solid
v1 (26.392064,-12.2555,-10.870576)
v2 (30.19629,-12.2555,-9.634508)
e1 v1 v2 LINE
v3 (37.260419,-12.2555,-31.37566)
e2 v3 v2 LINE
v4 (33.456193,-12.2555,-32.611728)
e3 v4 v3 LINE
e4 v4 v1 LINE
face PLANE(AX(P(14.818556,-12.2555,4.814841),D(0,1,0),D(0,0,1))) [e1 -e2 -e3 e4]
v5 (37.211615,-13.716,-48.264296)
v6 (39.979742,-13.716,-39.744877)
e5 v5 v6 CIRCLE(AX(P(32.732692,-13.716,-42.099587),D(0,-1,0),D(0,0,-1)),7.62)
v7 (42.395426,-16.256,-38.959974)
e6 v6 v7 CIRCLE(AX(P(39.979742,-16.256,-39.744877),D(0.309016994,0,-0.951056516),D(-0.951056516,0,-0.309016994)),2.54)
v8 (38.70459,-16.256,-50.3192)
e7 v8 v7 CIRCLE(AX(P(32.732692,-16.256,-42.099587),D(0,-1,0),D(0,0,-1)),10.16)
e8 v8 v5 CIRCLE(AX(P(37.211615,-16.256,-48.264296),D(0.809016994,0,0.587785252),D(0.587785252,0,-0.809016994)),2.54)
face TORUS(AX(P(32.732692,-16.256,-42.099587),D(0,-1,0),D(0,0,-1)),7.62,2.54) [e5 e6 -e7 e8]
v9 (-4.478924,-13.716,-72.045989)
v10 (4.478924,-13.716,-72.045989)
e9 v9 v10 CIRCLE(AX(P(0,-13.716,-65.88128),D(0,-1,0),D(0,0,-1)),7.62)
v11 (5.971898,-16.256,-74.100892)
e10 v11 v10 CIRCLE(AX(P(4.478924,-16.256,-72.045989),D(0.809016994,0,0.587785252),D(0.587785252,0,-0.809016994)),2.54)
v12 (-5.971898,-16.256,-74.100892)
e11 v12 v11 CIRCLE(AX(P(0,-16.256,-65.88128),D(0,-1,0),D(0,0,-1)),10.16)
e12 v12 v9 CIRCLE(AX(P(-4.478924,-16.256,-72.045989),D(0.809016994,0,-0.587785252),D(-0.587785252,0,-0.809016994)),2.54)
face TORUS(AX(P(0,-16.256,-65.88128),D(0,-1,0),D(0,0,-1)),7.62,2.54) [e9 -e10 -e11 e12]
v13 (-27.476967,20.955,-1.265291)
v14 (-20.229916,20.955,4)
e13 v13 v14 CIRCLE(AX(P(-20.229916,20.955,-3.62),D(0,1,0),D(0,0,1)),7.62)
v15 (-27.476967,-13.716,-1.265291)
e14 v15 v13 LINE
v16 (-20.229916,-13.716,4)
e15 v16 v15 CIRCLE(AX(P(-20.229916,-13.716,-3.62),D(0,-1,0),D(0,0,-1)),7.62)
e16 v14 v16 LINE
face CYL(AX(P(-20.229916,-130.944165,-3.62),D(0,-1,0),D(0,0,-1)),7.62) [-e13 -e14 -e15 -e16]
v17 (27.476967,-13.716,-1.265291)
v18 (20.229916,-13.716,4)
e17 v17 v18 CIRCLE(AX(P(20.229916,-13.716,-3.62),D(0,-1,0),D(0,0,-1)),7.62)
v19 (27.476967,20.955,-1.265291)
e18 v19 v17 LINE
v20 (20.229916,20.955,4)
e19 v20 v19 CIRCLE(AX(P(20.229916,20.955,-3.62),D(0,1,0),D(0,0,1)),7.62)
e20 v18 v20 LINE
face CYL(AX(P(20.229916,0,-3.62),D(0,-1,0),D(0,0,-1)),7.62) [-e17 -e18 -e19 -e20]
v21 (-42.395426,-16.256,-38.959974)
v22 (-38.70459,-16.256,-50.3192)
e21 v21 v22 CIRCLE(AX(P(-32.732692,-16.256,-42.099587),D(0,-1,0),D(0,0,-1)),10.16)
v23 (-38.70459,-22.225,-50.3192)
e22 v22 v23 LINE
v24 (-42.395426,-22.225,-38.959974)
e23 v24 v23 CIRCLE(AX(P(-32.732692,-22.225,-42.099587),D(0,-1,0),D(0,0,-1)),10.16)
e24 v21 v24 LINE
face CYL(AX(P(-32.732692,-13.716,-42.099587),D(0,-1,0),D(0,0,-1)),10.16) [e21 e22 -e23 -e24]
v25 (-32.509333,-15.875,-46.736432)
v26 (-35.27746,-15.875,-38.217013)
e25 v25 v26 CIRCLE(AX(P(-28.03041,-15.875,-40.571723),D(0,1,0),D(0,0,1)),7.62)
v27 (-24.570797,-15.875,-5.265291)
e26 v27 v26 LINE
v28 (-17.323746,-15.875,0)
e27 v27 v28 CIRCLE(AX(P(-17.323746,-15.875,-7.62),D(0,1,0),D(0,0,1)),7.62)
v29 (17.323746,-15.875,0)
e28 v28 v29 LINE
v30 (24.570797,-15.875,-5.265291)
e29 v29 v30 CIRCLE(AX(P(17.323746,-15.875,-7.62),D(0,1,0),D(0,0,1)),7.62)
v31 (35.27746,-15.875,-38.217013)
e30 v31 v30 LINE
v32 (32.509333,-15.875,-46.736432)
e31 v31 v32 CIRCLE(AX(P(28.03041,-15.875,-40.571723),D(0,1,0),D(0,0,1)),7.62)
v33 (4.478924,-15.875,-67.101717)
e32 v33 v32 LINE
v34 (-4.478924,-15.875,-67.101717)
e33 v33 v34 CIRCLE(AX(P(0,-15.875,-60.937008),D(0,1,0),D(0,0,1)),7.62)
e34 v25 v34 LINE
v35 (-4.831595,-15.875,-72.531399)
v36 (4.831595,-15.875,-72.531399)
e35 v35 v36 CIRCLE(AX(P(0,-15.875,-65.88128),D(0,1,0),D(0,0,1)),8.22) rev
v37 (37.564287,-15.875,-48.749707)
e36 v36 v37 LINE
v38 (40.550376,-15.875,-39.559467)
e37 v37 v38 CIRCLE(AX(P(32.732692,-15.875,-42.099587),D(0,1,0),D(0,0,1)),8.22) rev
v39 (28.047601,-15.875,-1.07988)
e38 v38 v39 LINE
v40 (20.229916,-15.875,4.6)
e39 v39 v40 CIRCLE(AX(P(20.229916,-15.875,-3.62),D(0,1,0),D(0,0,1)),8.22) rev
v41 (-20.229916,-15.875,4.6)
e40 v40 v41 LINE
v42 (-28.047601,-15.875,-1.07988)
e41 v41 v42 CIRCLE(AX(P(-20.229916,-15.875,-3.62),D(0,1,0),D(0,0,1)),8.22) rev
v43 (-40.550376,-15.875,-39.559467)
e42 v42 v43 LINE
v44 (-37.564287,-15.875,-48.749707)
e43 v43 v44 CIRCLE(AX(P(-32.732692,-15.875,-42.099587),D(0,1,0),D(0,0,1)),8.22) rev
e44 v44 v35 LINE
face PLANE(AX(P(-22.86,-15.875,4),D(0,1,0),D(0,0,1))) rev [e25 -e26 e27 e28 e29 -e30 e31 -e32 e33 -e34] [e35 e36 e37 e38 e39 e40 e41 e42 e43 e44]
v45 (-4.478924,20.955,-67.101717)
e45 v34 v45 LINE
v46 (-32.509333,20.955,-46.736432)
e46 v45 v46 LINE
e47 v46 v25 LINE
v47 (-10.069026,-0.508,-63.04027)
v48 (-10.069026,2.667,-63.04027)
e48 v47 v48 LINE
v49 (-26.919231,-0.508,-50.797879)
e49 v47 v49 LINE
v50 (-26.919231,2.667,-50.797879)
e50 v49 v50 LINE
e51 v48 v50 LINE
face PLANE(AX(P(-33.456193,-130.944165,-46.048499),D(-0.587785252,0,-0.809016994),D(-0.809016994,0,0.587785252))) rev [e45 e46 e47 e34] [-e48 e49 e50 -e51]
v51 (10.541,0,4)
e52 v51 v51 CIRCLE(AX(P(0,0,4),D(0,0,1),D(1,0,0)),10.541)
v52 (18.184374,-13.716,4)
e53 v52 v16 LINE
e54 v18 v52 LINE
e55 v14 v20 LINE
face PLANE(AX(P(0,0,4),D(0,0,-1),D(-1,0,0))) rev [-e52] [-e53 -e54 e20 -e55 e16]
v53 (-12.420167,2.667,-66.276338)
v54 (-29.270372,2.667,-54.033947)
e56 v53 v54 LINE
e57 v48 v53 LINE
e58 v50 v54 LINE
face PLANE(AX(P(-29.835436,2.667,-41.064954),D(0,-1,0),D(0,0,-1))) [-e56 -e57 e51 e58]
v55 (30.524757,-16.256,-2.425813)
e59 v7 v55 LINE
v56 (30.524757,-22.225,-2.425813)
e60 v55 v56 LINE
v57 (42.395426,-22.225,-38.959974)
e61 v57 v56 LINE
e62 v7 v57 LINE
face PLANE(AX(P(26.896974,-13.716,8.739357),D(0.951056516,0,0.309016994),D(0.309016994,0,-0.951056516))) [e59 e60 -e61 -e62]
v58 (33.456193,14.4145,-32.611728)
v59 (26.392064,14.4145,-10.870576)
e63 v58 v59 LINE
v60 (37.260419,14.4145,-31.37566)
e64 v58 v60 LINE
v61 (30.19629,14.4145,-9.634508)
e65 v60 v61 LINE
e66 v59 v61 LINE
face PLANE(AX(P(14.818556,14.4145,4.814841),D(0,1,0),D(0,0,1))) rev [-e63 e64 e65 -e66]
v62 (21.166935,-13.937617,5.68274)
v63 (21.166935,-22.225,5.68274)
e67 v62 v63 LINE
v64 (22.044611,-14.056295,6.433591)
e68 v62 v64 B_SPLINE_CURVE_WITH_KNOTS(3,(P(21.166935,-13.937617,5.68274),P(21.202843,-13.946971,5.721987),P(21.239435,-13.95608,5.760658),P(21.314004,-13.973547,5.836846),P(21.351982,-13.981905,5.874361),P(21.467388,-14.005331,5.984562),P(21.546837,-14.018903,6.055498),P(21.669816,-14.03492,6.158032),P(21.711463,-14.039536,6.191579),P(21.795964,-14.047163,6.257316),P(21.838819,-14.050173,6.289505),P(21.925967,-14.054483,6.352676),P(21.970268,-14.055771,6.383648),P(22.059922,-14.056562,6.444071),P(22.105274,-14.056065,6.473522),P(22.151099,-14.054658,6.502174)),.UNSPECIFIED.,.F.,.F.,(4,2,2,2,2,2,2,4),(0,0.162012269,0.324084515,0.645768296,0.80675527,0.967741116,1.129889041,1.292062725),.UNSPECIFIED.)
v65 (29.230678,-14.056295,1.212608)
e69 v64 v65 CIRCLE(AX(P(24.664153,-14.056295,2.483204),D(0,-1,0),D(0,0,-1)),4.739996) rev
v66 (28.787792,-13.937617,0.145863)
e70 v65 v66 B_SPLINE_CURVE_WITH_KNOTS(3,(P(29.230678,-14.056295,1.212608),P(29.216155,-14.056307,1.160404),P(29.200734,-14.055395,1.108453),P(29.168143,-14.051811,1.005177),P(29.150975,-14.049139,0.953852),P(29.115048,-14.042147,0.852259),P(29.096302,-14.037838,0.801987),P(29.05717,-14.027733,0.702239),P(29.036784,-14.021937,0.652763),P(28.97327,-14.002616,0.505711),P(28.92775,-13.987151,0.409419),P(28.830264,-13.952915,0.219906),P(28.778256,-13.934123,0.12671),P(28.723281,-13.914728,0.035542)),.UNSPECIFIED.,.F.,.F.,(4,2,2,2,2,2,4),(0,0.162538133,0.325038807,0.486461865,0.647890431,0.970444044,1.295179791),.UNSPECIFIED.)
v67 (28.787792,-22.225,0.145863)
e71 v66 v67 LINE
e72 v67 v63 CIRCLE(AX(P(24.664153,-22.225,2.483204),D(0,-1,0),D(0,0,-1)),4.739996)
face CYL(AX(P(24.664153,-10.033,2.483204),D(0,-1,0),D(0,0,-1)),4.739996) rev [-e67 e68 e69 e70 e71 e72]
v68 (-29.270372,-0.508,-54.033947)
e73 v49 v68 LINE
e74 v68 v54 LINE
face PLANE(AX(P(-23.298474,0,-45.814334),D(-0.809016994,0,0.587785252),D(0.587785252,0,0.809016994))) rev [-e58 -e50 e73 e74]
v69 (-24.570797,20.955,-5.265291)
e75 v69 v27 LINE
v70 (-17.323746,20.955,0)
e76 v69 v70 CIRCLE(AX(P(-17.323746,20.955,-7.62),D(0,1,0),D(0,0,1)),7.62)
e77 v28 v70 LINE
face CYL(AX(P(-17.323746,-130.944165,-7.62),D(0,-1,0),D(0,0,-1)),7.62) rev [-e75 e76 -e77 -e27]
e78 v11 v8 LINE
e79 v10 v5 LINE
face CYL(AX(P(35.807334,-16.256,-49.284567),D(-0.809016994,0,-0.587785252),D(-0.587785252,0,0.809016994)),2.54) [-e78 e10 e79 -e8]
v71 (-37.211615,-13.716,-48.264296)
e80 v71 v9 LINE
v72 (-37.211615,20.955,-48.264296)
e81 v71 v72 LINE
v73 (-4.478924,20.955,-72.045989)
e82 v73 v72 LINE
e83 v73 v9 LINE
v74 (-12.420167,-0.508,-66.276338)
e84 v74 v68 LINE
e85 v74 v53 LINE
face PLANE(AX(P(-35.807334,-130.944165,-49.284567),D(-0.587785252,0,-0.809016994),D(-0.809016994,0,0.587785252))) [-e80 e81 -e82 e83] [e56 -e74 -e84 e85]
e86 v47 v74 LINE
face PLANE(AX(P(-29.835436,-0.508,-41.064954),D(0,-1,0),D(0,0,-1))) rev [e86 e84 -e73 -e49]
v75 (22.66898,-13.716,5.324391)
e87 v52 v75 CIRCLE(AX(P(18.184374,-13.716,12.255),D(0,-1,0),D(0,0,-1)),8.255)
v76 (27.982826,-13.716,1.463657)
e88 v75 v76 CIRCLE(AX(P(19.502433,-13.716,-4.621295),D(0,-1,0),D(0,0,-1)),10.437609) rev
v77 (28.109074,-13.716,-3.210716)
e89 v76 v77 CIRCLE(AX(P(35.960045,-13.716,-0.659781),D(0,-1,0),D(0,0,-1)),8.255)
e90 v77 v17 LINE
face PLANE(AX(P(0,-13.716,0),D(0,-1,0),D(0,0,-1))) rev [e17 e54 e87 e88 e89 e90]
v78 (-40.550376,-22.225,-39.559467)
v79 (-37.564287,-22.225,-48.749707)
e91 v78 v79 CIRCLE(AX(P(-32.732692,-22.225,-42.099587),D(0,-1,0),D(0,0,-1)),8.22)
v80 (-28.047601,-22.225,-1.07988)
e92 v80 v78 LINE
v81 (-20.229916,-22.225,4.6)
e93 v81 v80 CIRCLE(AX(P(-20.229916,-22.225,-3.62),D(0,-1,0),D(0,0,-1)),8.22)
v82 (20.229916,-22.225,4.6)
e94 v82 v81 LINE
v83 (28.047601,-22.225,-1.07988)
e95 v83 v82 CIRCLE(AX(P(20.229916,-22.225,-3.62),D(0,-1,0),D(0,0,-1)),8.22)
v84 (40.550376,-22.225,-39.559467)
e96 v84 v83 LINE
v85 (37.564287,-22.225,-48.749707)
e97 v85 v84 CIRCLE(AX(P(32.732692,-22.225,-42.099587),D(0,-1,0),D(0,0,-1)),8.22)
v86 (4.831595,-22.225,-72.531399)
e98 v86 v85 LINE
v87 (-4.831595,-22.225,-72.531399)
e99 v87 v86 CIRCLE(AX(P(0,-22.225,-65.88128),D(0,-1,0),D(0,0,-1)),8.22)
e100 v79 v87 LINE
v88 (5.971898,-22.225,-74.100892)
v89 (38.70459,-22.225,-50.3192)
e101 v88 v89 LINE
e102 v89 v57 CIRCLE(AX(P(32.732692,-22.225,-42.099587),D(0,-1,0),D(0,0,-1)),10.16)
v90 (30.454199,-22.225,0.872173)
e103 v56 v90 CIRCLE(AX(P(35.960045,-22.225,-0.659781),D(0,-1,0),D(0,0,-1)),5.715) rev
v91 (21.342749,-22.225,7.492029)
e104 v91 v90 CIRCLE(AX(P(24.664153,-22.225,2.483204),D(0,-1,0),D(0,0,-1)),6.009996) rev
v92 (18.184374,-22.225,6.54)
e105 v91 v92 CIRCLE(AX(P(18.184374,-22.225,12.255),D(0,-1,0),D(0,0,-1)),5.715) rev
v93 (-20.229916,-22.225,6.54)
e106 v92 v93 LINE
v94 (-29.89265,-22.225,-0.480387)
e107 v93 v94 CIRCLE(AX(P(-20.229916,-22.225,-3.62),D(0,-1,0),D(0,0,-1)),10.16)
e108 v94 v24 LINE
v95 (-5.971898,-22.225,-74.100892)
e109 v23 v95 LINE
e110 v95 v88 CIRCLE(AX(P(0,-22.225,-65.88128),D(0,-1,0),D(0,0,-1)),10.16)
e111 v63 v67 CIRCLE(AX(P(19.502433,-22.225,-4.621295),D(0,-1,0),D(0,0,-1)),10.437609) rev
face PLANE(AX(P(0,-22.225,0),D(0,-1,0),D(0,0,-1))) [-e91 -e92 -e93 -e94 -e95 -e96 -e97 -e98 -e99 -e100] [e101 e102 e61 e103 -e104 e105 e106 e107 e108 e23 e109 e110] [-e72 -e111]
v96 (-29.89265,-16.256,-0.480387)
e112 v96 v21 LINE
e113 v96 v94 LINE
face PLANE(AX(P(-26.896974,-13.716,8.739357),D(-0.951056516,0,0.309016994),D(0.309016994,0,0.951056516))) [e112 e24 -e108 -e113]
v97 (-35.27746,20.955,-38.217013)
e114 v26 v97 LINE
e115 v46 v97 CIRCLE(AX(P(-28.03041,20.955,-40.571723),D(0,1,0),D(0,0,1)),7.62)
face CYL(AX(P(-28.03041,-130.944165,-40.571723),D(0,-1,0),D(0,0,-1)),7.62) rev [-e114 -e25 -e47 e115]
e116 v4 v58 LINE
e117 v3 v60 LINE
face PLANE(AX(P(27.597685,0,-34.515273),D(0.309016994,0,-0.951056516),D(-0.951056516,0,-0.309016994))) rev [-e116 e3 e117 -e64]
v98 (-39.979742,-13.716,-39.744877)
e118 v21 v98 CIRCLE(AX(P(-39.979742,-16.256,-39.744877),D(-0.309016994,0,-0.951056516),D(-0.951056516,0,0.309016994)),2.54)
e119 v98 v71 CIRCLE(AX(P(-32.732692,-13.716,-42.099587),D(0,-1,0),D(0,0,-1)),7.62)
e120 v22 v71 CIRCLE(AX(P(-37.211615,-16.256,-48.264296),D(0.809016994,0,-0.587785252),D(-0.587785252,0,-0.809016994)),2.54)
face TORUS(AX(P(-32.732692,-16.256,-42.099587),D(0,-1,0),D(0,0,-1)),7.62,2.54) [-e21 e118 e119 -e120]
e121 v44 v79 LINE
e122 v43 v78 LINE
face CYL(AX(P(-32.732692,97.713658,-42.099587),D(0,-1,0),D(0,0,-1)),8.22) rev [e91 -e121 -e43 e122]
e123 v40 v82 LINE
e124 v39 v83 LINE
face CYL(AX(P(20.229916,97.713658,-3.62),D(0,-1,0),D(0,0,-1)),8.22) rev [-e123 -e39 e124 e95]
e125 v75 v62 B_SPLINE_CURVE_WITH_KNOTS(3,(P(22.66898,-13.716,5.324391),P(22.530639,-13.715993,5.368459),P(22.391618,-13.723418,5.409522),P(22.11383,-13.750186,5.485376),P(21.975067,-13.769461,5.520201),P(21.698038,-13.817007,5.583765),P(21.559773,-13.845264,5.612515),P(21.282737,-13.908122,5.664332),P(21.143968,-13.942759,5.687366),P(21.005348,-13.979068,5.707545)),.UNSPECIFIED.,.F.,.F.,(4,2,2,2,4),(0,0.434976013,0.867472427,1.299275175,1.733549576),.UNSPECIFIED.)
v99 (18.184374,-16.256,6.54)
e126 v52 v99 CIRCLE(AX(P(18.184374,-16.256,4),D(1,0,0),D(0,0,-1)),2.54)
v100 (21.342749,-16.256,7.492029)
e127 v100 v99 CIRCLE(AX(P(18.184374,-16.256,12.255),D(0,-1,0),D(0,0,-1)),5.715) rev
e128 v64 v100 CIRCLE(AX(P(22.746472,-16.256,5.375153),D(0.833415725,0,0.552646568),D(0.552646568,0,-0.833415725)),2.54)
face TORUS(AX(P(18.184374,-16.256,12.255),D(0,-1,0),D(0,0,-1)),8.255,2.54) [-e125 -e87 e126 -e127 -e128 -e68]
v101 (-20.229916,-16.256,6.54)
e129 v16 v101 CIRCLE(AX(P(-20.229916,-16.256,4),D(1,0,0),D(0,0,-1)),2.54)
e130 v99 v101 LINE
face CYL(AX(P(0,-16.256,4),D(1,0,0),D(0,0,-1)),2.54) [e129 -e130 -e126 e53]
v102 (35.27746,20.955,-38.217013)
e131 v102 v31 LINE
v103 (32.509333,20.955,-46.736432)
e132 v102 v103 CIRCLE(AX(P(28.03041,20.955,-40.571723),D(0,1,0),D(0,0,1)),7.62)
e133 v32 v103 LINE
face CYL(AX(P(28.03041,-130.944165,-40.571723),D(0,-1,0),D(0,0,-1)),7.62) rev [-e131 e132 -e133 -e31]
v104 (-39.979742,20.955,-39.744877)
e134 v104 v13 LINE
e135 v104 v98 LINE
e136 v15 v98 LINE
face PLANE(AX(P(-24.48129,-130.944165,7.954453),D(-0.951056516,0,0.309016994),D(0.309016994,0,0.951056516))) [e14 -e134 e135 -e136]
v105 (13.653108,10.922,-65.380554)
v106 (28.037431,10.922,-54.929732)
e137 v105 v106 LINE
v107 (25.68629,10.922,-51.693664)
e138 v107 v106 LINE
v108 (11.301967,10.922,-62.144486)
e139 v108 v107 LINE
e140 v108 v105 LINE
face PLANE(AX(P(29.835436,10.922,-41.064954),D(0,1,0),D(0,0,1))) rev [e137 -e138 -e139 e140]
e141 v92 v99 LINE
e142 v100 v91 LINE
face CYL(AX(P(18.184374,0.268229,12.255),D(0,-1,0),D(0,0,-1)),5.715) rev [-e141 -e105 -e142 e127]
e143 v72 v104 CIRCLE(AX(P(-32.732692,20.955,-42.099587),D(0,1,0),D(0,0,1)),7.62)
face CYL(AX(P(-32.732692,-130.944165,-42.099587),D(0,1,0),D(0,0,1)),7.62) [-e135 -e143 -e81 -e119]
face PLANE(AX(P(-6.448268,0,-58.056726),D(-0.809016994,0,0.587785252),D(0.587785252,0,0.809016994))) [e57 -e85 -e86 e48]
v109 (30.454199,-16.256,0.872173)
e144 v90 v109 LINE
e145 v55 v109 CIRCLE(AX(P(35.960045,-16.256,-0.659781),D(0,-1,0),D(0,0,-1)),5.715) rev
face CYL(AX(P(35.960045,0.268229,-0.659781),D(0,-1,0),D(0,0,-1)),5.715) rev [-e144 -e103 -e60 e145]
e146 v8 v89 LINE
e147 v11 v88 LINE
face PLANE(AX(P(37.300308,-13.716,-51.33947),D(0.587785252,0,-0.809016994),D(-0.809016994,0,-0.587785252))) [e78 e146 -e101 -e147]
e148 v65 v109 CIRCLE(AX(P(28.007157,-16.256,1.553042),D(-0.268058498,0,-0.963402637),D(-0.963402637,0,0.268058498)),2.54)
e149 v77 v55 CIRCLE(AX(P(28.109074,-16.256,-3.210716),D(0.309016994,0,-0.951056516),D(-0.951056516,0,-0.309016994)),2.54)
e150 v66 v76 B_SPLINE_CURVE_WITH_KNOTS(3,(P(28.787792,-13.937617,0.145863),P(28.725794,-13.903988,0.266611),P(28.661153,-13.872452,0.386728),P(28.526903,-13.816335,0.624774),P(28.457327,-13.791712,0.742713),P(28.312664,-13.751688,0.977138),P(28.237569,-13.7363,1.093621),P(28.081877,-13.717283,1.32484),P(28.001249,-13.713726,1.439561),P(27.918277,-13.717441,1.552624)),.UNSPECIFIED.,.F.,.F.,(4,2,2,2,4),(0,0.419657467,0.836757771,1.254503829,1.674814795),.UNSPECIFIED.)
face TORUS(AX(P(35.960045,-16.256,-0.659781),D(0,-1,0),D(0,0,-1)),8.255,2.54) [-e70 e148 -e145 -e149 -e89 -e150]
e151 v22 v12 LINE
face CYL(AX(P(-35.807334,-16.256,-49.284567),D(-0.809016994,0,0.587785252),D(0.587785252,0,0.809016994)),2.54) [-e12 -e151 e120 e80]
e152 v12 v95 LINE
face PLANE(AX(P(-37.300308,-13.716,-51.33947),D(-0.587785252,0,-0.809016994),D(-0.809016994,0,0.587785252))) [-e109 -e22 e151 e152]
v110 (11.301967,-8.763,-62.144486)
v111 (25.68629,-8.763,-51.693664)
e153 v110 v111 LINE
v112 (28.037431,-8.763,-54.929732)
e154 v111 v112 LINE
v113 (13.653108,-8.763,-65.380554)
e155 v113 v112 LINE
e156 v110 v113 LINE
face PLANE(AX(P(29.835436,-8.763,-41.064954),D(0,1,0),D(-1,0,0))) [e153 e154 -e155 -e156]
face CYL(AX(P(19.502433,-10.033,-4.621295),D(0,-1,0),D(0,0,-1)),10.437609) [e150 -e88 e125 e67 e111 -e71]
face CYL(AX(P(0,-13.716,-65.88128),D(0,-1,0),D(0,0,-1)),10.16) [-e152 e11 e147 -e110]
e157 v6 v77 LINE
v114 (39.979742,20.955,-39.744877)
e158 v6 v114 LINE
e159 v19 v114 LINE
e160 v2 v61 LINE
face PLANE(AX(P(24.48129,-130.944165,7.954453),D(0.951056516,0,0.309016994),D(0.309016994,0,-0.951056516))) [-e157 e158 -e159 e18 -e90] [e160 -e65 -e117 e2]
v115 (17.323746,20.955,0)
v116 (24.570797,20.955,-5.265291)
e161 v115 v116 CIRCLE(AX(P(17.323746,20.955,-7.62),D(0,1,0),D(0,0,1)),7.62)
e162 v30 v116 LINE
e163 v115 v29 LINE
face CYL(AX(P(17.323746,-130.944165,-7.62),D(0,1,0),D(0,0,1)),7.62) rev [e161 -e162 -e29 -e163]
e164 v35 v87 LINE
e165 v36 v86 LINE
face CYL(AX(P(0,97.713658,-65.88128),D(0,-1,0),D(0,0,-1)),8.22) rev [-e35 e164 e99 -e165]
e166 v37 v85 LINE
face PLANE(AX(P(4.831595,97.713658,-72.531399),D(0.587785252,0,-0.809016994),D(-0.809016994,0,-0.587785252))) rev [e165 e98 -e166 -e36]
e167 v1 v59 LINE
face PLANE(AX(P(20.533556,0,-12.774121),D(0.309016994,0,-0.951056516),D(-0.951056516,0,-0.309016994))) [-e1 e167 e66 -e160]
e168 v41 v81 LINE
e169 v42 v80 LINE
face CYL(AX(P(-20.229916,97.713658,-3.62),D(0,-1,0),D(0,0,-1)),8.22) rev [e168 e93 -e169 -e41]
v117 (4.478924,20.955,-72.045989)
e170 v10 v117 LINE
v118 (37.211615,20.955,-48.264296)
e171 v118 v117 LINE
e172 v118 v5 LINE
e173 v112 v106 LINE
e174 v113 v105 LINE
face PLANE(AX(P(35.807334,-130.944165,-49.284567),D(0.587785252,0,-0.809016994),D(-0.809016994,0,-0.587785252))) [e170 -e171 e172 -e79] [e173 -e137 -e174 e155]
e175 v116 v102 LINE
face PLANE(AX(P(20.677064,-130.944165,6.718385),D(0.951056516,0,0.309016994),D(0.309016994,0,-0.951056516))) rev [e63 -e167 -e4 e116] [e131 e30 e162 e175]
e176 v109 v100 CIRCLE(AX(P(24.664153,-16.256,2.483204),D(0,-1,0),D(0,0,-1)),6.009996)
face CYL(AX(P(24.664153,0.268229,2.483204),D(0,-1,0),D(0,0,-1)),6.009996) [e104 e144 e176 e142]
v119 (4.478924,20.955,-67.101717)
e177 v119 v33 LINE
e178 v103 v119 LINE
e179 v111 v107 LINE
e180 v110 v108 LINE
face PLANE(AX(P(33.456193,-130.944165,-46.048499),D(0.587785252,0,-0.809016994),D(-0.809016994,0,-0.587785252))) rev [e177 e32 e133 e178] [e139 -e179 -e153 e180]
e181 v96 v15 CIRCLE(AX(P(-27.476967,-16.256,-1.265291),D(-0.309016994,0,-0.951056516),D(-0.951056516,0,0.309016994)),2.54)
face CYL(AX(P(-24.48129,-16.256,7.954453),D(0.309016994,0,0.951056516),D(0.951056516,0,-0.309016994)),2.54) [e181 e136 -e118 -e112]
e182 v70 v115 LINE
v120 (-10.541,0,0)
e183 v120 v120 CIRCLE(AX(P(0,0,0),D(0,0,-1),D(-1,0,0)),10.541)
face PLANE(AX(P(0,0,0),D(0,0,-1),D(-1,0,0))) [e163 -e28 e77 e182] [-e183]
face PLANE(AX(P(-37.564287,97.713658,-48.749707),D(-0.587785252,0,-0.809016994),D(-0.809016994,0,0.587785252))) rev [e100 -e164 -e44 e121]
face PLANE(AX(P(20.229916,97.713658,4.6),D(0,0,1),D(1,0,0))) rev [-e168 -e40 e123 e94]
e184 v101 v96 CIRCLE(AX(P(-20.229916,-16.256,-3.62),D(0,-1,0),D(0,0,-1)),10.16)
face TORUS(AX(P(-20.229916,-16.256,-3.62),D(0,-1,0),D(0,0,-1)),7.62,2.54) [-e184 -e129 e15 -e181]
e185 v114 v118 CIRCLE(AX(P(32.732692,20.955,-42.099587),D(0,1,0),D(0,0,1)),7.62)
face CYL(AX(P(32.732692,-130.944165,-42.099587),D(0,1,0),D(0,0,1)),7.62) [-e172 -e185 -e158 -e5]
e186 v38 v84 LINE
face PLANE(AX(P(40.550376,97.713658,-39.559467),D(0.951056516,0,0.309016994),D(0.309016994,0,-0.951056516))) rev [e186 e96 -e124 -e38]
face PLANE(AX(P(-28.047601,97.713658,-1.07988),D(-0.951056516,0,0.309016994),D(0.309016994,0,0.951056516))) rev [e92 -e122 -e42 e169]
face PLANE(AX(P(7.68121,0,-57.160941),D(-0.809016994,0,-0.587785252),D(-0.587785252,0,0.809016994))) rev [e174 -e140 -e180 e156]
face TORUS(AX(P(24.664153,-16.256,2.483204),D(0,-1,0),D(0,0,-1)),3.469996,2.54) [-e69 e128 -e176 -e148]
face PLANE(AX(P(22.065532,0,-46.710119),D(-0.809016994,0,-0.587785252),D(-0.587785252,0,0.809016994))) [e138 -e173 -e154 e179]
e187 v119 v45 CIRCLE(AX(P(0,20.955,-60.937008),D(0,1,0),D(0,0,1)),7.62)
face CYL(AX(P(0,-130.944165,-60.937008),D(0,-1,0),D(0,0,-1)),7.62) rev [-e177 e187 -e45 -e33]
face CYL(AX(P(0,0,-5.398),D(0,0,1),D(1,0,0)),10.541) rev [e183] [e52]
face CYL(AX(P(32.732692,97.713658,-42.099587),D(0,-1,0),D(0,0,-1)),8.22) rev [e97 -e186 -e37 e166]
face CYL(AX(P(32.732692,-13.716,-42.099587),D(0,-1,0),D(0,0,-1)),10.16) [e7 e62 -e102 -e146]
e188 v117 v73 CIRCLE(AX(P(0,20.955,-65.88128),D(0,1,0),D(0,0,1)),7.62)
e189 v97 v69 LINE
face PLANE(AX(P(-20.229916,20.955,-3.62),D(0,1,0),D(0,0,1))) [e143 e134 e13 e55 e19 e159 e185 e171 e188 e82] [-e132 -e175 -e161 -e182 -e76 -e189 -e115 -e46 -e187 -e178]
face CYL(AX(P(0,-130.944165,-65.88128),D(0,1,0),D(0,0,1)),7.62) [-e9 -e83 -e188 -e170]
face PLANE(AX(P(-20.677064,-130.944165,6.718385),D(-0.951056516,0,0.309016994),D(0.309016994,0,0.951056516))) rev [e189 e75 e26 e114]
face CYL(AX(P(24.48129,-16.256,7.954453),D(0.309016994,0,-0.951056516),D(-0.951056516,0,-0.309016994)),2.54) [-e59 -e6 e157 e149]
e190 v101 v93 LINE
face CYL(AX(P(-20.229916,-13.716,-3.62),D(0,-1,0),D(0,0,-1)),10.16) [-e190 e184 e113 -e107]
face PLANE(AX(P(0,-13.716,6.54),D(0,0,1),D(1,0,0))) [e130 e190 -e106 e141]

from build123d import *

# Parameters (mm, degrees)
SKETCH1_W                = 45.72
SKETCH1_H                = 31.75
SKETCH1_R                = 10.16
BOSS_EXTRUDE1_DEPTH      = 4
BOSS_EXTRUDE2_DEPTH      = 31.75
FILLET1_R                = 7.62
BOSS_EXTRUDE3_DEPTH      = 5.08
BOSS_EXTRUDE4_DEPTH      = 6.35
BOSS_EXTRUDE4_DEPTH_BACK = 2.159
BOSS_EXTRUDE5_START      = -8.509
BOSS_EXTRUDE5_DEPTH      = 8.509
CUT_EXTRUDE4_DEPTH       = 12.192
FILLET5_R                = 5.715
FILLET6_R                = 2.54
CUT_EXTRUDE5_DEPTH       = 6.35
SKETCH14_W               = 22.86
SKETCH14_H               = 26.67
CUT_EXTRUDE6_DEPTH       = 10.16
SKETCH15_W               = 17.78
SKETCH15_H               = 19.685
CUT_EXTRUDE7_DEPTH       = 10.16
SKETCH16_W               = 20.828
SKETCH16_H               = 3.175
CUT_EXTRUDE8_DEPTH       = 10.16
CUT_EXTRUDE9_START       = -9.398
SKETCH17_R               = 10.541
SKETCH17_R_2             = 10.16
CUT_EXTRUDE9_DEPTH       = 9.398


with BuildPart() as part:
    # Sketch1 → Boss-Extrude1 (new body)
    with BuildSketch(Plane.XY):
        Rectangle(SKETCH1_W, SKETCH1_H)
        Circle(SKETCH1_R, mode=Mode.SUBTRACT)
    extrude(amount=BOSS_EXTRUDE1_DEPTH)

    # Sketch2 → Boss-Extrude2 (add)
    with BuildSketch(Plane(origin=(0, 15.875, 0), x_dir=(1, 0, 0), z_dir=(0, 1, 0))):
        Polygon((36.988256983, 43.482303925), (22.86, 0), (22.86, -4), (25.766170112, -4), (41.690539001, 45.01016797), (0, 75.30011757), (-41.690539001, 45.01016797), (-25.766170112, -4), (-22.86, -4), (-22.86, 0), (-36.988256983, 43.482303925), (0, 70.35584566), align=None)
    extrude(amount=-BOSS_EXTRUDE2_DEPTH)

    # Fillet1
    fillet1_edges = [part.edges().sort_by_distance(p)[0] for p in [
        (0, 0, -75.30011757),
        (41.690539001, 0, -45.01016797),
        (25.766170112, 0, 4),
        (36.988256983, 0, -43.482303925),
        (0, 0, -70.35584566),
        (-36.988256983, 0, -43.482303925),
        (-25.766170112, 0, 4),
        (-41.690539001, 0, -45.01016797),
        (-22.86, 0, 0),
        (22.86, 0, 0),
    ]]
    fillet(fillet1_edges, radius=FILLET1_R)

    # Sketch6 → Boss-Extrude3 (add)
    with BuildSketch(Plane(origin=(0, 15.875, 0), x_dir=(1, 0, 0), z_dir=(0, 1, 0))):
        with BuildLine():
            Line((-20.229916049, -4), (20.229916049, -4))
            ThreePointArc((20.229916049, -4), (24.708839671, -2.544709497), (27.476966703, 1.265290503))
            Line((27.476966703, 1.265290503), (39.97974241, 39.744877467))
            ThreePointArc((39.97974241, 39.744877467), (39.97974241, 44.454296461), (37.211615379, 48.264296461))
            Line((37.211615379, 48.264296461), (4.478923622, 72.045989078))
            ThreePointArc((4.478923622, 72.045989078), (0, 73.501279581), (-4.478923622, 72.045989078))
            Line((-4.478923622, 72.045989078), (-37.211615379, 48.264296461))
            ThreePointArc((-37.211615379, 48.264296461), (-39.97974241, 44.454296461), (-39.97974241, 39.744877467))
            Line((-39.97974241, 39.744877467), (-27.476966703, 1.265290503))
            ThreePointArc((-27.476966703, 1.265290503), (-24.708839671, -2.544709497), (-20.229916049, -4))
        make_face()
        with BuildLine():
            Line((24.570796591, 5.265290503), (35.277460392, 38.217013422))
            ThreePointArc((35.277460392, 38.217013422), (35.277460392, 42.926432416), (32.50933336, 46.736432416))
            Line((32.50933336, 46.736432416), (4.478923622, 67.101717168))
            ThreePointArc((4.478923622, 67.101717168), (0, 68.557007671), (-4.478923622, 67.101717168))
            Line((-4.478923622, 67.101717168), (-32.50933336, 46.736432416))
            ThreePointArc((-32.50933336, 46.736432416), (-35.277460392, 42.926432416), (-35.277460392, 38.217013422))
            Line((-35.277460392, 38.217013422), (-24.570796591, 5.265290503))
            ThreePointArc((-24.570796591, 5.265290503), (-21.802669559, 1.455290503), (-17.323745937, 0))
            Line((-17.323745937, 0), (17.323745937, 0))
            ThreePointArc((17.323745937, 0), (21.802669559, 1.455290503), (24.570796591, 5.265290503))
        make_face(mode=Mode.SUBTRACT)
    extrude(amount=BOSS_EXTRUDE3_DEPTH)

    # Sketch8 → Boss-Extrude4 (add, two sides: drawn at the far end of the back side and taken through both)
    with BuildSketch(Plane.XZ.offset(15.875).offset(-BOSS_EXTRUDE4_DEPTH_BACK)):
        with BuildLine():
            Line((5.971898163, -74.100892244), (38.70458992, -50.319199627))
            ThreePointArc((38.70458992, -50.319199627), (42.395425962, -45.239199627), (42.395425962, -38.959974301))
            Line((42.395425962, -38.959974301), (29.892650254, -0.480387337))
            ThreePointArc((29.892650254, -0.480387337), (26.201814212, 4.599612663), (20.229916049, 6.54))
            Line((20.229916049, 6.54), (-20.229916049, 6.54))
            ThreePointArc((-20.229916049, 6.54), (-26.201814212, 4.599612663), (-29.892650254, -0.480387337))
            Line((-29.892650254, -0.480387337), (-42.395425962, -38.959974301))
            ThreePointArc((-42.395425962, -38.959974301), (-42.395425962, -45.239199627), (-38.70458992, -50.319199627))
            Line((-38.70458992, -50.319199627), (-5.971898163, -74.100892244))
            ThreePointArc((-5.971898163, -74.100892244), (0, -76.041279581), (5.971898163, -74.100892244))
        make_face()
        with BuildLine():
            Line((39.97974241, -39.744877467), (27.476966703, -1.265290503))
            ThreePointArc((27.476966703, -1.265290503), (24.708839671, 2.544709497), (20.229916049, 4))
            Line((20.229916049, 4), (-20.229916049, 4))
            ThreePointArc((-20.229916049, 4), (-24.708839671, 2.544709497), (-27.476966703, -1.265290503))
            Line((-27.476966703, -1.265290503), (-39.97974241, -39.744877467))
            ThreePointArc((-39.97974241, -39.744877467), (-39.97974241, -44.454296461), (-37.211615379, -48.264296461))
            Line((-37.211615379, -48.264296461), (-4.478923622, -72.045989078))
            ThreePointArc((-4.478923622, -72.045989078), (0, -73.501279581), (4.478923622, -72.045989078))
            Line((4.478923622, -72.045989078), (37.211615379, -48.264296461))
            ThreePointArc((37.211615379, -48.264296461), (39.97974241, -44.454296461), (39.97974241, -39.744877467))
        make_face(mode=Mode.SUBTRACT)
    extrude(amount=BOSS_EXTRUDE4_DEPTH + BOSS_EXTRUDE4_DEPTH_BACK)

    # Sketch11 → Boss-Extrude5 (add)
    with BuildSketch(Plane.XZ.offset(22.225).offset(BOSS_EXTRUDE5_START)):
        with BuildLine():
            Line((19.948787859, 5.414930333), (27.190045273, 1.56775587))
            Line((27.190045273, 1.56775587), (29.892650254, -0.480387337))
            ThreePointArc((29.892650254, -0.480387337), (26.201814212, 4.599612663), (20.229916049, 6.54))
            Line((20.229916049, 6.54), (19.948787859, 5.414930333))
        make_face()
        with BuildLine():
            ThreePointArc((20.229916049, 6.54), (28.196740294, 7.345392854), (29.892650254, -0.480387337))
            ThreePointArc((29.892650254, -0.480387337), (26.201814212, 4.599612663), (20.229916049, 6.54))
        make_face()
    extrude(amount=BOSS_EXTRUDE5_DEPTH)

    # Sketch12 → Cut-Extrude4 (cut)
    with BuildSketch(Plane.XZ.offset(22.225)):
        with BuildLine():
            ThreePointArc((28.787792432, 0.145862767), (27.450253023, 6.317941272), (21.166935135, 5.682739694))
            ThreePointArc((21.166935135, 5.682739694), (25.637505825, 3.822908801), (28.787792432, 0.145862767))
        make_face()
    extrude(amount=-CUT_EXTRUDE4_DEPTH, mode=Mode.SUBTRACT)

    # Fillet5
    fillet5_edges = [part.edges().sort_by_distance(p)[0] for p in [
        (20.229916049, -17.9705, 6.54),
        (29.892650254, -17.9705, -0.480387337),
    ]]
    fillet(fillet5_edges, radius=FILLET5_R)

    # Fillet6
    # the kernel refuses this fillet: 2.54 mm, written as the material it takes off along each edge
    with BuildSketch(Plane(origin=(32.732691756, -13.716, -42.099586964), x_dir=(0.5877852522924708, 0, -0.809016994374949), z_dir=(-0.809016994374949, 0, -0.5877852522924708))) as fillet6_piece_1:
        with BuildLine():
            CenterArc((10.16 - FILLET6_R, FILLET6_R), FILLET6_R, 270, 90)
            Line((10.16 - FILLET6_R, 0), (10.16, 0))
            Line((10.16, 0), (10.16, FILLET6_R))
        make_face()
    revolve(axis=Axis((32.732691756, -13.716, -42.099586964), (0, -1, 0)), revolution_arc=72, mode=Mode.SUBTRACT)
    with BuildSketch(Plane(origin=(5.971898163, -13.716, -74.100892244), x_dir=(0, -1, 0), z_dir=(0.8090169943749487, 0, 0.5877852522924716)), Plane(origin=(-38.70458992, -13.716, -50.319199627), x_dir=(0, -1, 0), z_dir=(0.8090169943749469, 0, -0.5877852522924739)), Plane(origin=(-29.892650254, -13.716, -0.480387337), x_dir=(0, -1, 0), z_dir=(-0.3090169943749508, 0, -0.9510565162951525))) as fillet6_piece_2:
        with BuildLine():
            CenterArc((FILLET6_R, -FILLET6_R), FILLET6_R, 90, 90)
            Line((0, -FILLET6_R), (0, 0))
            Line((0, 0), (FILLET6_R, 0))
        make_face()
    extrude(amount=40.459832097, mode=Mode.SUBTRACT)
    with BuildSketch(Plane(origin=(0, -13.716, -65.881279581), x_dir=(-0.5877852522924719, 0, -0.8090169943749482), z_dir=(-0.8090169943749482, 0, 0.5877852522924719))) as fillet6_piece_3:
        with BuildLine():
            CenterArc((10.16 - FILLET6_R, FILLET6_R), FILLET6_R, 270, 90)
            Line((10.16 - FILLET6_R, 0), (10.16, 0))
            Line((10.16, 0), (10.16, FILLET6_R))
        make_face()
    revolve(axis=Axis((0, -13.716, -65.881279581), (0, -1, 0)), revolution_arc=72, mode=Mode.SUBTRACT)
    with BuildSketch(Plane(origin=(-32.732691756, -13.716, -42.099586964), x_dir=(-0.9510565162951536, 0, 0.30901699437494734), z_dir=(0.30901699437494734, 0, 0.9510565162951536))) as fillet6_piece_4:
        with BuildLine():
            CenterArc((10.16 - FILLET6_R, FILLET6_R), FILLET6_R, 270, 90)
            Line((10.16 - FILLET6_R, 0), (10.16, 0))
            Line((10.16, 0), (10.16, FILLET6_R))
        make_face()
    revolve(axis=Axis((-32.732691756, -13.716, -42.099586964), (0, -1, 0)), revolution_arc=72, mode=Mode.SUBTRACT)
    with BuildSketch(Plane(origin=(-20.229916049, -13.716, -3.62), x_dir=(0, 0, 1), z_dir=(1, 0, 0))) as fillet6_piece_5:
        with BuildLine():
            CenterArc((10.16 - FILLET6_R, FILLET6_R), FILLET6_R, 270, 90)
            Line((10.16 - FILLET6_R, 0), (10.16, 0))
            Line((10.16, 0), (10.16, FILLET6_R))
        make_face()
    revolve(axis=Axis((-20.229916049, -13.716, -3.62), (0, -1, 0)), revolution_arc=72, mode=Mode.SUBTRACT)
    with BuildSketch(Plane(origin=(18.184374257, -13.716, 6.54), x_dir=(0, -1, 0), z_dir=(-1, 0, 0)), Plane(origin=(42.395425962, -13.716, -38.959974301), x_dir=(0, -1, 0), z_dir=(-0.30901699437494484, 0, 0.9510565162951544))) as fillet6_piece_6:
        with BuildLine():
            CenterArc((FILLET6_R, -FILLET6_R), FILLET6_R, 90, 90)
            Line((0, -FILLET6_R), (0, 0))
            Line((0, 0), (FILLET6_R, 0))
        make_face()
    extrude(amount=38.414290306, mode=Mode.SUBTRACT)
    with BuildSketch(Plane(origin=(18.184374257, -13.716, 12.255), x_dir=(0, 0, -1), z_dir=(-1, 0, 0))) as fillet6_piece_7:
        with BuildLine():
            CenterArc((5.715 + FILLET6_R, FILLET6_R), FILLET6_R, 180, 90)
            Line((5.715 + FILLET6_R, 0), (5.715, 0))
            Line((5.715, 0), (5.715, FILLET6_R))
        make_face()
    revolve(axis=Axis((18.184374257, -13.716, 12.255), (0, -1, 0)), revolution_arc=33.548768752, mode=Mode.SUBTRACT)
    with BuildSketch(Plane(origin=(35.960045421, -13.716, -0.659781065), x_dir=(-0.9510565162951543, 0, -0.30901699437494495), z_dir=(0.30901699437494495, 0, -0.9510565162951543))) as fillet6_piece_8:
        with BuildLine():
            CenterArc((5.715 + FILLET6_R, -FILLET6_R), FILLET6_R, 90, 90)
            Line((5.715 + FILLET6_R, 0), (5.715, 0))
            Line((5.715, 0), (5.715, -FILLET6_R))
        make_face()
    revolve(axis=Axis((35.960045421, -13.716, -0.659781065), (0, 1, 0)), revolution_arc=33.548768752, mode=Mode.SUBTRACT)
    with BuildSketch(Plane(origin=(24.664153166, -13.716, 2.483203799), x_dir=(-0.5526465683039513, 0, 0.8334157249187624), z_dir=(-0.8334157249187624, 0, -0.5526465683039513))) as fillet6_piece_9:
        with BuildLine():
            CenterArc((6.009996192 - FILLET6_R, -FILLET6_R), FILLET6_R, 0, 90)
            Line((6.009996192 - FILLET6_R, 0), (6.009996192, 0))
            Line((6.009996192, 0), (6.009996192, -FILLET6_R))
        make_face()
    revolve(axis=Axis((24.664153166, -13.716, 2.483203799), (0, 1, 0)), revolution_arc=139.097537505, mode=Mode.SUBTRACT)

    # Sketch13 → Cut-Extrude5 (cut)
    # profile 1 of 2: a face of its own
    with BuildSketch(Plane.XZ.offset(22.225)):
        with BuildLine():
            Line((20.229916049, 4.6), (-20.229916049, 4.6))
            ThreePointArc((-20.229916049, 4.6), (-25.061510822, 3.030119694), (-28.047600613, -1.079880306))
            Line((-28.047600613, -1.079880306), (-40.55037632, -39.559467271))
            ThreePointArc((-40.55037632, -39.559467271), (-40.55037632, -44.639706658), (-37.56428653, -48.749706658))
            Line((-37.56428653, -48.749706658), (-4.831594774, -72.531399275))
            ThreePointArc((-4.831594774, -72.531399275), (0, -74.101279581), (4.831594774, -72.531399275))
            Line((4.831594774, -72.531399275), (37.56428653, -48.749706658))
            ThreePointArc((37.56428653, -48.749706658), (40.55037632, -44.639706658), (40.55037632, -39.559467271))
            Line((40.55037632, -39.559467271), (28.047600613, -1.079880306))
            ThreePointArc((28.047600613, -1.079880306), (25.061510822, 3.030119694), (20.229916049, 4.6))
        make_face()
        with BuildLine():
            Line((39.97974241, -39.744877467), (27.476966703, -1.265290503))
            ThreePointArc((27.476966703, -1.265290503), (24.708839671, 2.544709497), (20.229916049, 4))
            Line((20.229916049, 4), (-20.229916049, 4))
            ThreePointArc((-20.229916049, 4), (-24.708839671, 2.544709497), (-27.476966703, -1.265290503))
            Line((-27.476966703, -1.265290503), (-39.97974241, -39.744877467))
            ThreePointArc((-39.97974241, -39.744877467), (-39.97974241, -44.454296461), (-37.211615379, -48.264296461))
            Line((-37.211615379, -48.264296461), (-4.478923622, -72.045989078))
            ThreePointArc((-4.478923622, -72.045989078), (0, -73.501279581), (4.478923622, -72.045989078))
            Line((4.478923622, -72.045989078), (37.211615379, -48.264296461))
            ThreePointArc((37.211615379, -48.264296461), (39.97974241, -44.454296461), (39.97974241, -39.744877467))
        make_face(mode=Mode.SUBTRACT)
    # profile 2 of 2: a face of its own
    with BuildSketch(Plane.XZ.offset(22.225)):
        with BuildLine():
            ThreePointArc((28.787792432, 0.145862767), (27.450253023, 6.317941272), (21.166935135, 5.682739694))
            ThreePointArc((21.166935135, 5.682739694), (25.637505825, 3.822908801), (28.787792432, 0.145862767))
        make_face()
    extrude(amount=-CUT_EXTRUDE5_DEPTH, mode=Mode.SUBTRACT)

    # Sketch14 → Cut-Extrude6 (cut)
    with BuildSketch(Plane(origin=(24.481290311, 0, 7.954453411), x_dir=(0.30901699437494484, 0, -0.9510565162951544), z_dir=(0.9510565162951544, 0, 0.30901699437494484))):
        with Locations((29.924128491, 1.0795)):
            Rectangle(SKETCH14_W, SKETCH14_H)
    extrude(amount=-CUT_EXTRUDE6_DEPTH, mode=Mode.SUBTRACT)

    # Sketch15 → Cut-Extrude7 (cut)
    with BuildSketch(Plane(origin=(35.807333746, 0, -49.284566789), x_dir=(-0.8090169943749486, 0, -0.5877852522924718), z_dir=(0.5877852522924718, 0, -0.8090169943749486))):
        with Locations((18.494128491, 1.0795)):
            Rectangle(SKETCH15_W, SKETCH15_H)
    extrude(amount=-CUT_EXTRUDE7_DEPTH, mode=Mode.SUBTRACT)

    # Sketch16 → Cut-Extrude8 (cut)
    with BuildSketch(Plane(origin=(-35.807333746, 0, -49.284566789), x_dir=(-0.8090169943749469, 0, 0.5877852522924738), z_dir=(-0.5877852522924738, 0, -0.8090169943749469))):
        with Locations((-18.494128491, 1.0795)):
            Rectangle(SKETCH16_W, SKETCH16_H)
    extrude(amount=-CUT_EXTRUDE8_DEPTH, mode=Mode.SUBTRACT)

    # Sketch17 → Cut-Extrude9 (cut)
    with BuildSketch(Plane.XY.offset(4).offset(CUT_EXTRUDE9_START)):
        Circle(SKETCH17_R)
        Circle(SKETCH17_R_2, mode=Mode.SUBTRACT)
    extrude(amount=CUT_EXTRUDE9_DEPTH, mode=Mode.SUBTRACT)


solid = part.part
